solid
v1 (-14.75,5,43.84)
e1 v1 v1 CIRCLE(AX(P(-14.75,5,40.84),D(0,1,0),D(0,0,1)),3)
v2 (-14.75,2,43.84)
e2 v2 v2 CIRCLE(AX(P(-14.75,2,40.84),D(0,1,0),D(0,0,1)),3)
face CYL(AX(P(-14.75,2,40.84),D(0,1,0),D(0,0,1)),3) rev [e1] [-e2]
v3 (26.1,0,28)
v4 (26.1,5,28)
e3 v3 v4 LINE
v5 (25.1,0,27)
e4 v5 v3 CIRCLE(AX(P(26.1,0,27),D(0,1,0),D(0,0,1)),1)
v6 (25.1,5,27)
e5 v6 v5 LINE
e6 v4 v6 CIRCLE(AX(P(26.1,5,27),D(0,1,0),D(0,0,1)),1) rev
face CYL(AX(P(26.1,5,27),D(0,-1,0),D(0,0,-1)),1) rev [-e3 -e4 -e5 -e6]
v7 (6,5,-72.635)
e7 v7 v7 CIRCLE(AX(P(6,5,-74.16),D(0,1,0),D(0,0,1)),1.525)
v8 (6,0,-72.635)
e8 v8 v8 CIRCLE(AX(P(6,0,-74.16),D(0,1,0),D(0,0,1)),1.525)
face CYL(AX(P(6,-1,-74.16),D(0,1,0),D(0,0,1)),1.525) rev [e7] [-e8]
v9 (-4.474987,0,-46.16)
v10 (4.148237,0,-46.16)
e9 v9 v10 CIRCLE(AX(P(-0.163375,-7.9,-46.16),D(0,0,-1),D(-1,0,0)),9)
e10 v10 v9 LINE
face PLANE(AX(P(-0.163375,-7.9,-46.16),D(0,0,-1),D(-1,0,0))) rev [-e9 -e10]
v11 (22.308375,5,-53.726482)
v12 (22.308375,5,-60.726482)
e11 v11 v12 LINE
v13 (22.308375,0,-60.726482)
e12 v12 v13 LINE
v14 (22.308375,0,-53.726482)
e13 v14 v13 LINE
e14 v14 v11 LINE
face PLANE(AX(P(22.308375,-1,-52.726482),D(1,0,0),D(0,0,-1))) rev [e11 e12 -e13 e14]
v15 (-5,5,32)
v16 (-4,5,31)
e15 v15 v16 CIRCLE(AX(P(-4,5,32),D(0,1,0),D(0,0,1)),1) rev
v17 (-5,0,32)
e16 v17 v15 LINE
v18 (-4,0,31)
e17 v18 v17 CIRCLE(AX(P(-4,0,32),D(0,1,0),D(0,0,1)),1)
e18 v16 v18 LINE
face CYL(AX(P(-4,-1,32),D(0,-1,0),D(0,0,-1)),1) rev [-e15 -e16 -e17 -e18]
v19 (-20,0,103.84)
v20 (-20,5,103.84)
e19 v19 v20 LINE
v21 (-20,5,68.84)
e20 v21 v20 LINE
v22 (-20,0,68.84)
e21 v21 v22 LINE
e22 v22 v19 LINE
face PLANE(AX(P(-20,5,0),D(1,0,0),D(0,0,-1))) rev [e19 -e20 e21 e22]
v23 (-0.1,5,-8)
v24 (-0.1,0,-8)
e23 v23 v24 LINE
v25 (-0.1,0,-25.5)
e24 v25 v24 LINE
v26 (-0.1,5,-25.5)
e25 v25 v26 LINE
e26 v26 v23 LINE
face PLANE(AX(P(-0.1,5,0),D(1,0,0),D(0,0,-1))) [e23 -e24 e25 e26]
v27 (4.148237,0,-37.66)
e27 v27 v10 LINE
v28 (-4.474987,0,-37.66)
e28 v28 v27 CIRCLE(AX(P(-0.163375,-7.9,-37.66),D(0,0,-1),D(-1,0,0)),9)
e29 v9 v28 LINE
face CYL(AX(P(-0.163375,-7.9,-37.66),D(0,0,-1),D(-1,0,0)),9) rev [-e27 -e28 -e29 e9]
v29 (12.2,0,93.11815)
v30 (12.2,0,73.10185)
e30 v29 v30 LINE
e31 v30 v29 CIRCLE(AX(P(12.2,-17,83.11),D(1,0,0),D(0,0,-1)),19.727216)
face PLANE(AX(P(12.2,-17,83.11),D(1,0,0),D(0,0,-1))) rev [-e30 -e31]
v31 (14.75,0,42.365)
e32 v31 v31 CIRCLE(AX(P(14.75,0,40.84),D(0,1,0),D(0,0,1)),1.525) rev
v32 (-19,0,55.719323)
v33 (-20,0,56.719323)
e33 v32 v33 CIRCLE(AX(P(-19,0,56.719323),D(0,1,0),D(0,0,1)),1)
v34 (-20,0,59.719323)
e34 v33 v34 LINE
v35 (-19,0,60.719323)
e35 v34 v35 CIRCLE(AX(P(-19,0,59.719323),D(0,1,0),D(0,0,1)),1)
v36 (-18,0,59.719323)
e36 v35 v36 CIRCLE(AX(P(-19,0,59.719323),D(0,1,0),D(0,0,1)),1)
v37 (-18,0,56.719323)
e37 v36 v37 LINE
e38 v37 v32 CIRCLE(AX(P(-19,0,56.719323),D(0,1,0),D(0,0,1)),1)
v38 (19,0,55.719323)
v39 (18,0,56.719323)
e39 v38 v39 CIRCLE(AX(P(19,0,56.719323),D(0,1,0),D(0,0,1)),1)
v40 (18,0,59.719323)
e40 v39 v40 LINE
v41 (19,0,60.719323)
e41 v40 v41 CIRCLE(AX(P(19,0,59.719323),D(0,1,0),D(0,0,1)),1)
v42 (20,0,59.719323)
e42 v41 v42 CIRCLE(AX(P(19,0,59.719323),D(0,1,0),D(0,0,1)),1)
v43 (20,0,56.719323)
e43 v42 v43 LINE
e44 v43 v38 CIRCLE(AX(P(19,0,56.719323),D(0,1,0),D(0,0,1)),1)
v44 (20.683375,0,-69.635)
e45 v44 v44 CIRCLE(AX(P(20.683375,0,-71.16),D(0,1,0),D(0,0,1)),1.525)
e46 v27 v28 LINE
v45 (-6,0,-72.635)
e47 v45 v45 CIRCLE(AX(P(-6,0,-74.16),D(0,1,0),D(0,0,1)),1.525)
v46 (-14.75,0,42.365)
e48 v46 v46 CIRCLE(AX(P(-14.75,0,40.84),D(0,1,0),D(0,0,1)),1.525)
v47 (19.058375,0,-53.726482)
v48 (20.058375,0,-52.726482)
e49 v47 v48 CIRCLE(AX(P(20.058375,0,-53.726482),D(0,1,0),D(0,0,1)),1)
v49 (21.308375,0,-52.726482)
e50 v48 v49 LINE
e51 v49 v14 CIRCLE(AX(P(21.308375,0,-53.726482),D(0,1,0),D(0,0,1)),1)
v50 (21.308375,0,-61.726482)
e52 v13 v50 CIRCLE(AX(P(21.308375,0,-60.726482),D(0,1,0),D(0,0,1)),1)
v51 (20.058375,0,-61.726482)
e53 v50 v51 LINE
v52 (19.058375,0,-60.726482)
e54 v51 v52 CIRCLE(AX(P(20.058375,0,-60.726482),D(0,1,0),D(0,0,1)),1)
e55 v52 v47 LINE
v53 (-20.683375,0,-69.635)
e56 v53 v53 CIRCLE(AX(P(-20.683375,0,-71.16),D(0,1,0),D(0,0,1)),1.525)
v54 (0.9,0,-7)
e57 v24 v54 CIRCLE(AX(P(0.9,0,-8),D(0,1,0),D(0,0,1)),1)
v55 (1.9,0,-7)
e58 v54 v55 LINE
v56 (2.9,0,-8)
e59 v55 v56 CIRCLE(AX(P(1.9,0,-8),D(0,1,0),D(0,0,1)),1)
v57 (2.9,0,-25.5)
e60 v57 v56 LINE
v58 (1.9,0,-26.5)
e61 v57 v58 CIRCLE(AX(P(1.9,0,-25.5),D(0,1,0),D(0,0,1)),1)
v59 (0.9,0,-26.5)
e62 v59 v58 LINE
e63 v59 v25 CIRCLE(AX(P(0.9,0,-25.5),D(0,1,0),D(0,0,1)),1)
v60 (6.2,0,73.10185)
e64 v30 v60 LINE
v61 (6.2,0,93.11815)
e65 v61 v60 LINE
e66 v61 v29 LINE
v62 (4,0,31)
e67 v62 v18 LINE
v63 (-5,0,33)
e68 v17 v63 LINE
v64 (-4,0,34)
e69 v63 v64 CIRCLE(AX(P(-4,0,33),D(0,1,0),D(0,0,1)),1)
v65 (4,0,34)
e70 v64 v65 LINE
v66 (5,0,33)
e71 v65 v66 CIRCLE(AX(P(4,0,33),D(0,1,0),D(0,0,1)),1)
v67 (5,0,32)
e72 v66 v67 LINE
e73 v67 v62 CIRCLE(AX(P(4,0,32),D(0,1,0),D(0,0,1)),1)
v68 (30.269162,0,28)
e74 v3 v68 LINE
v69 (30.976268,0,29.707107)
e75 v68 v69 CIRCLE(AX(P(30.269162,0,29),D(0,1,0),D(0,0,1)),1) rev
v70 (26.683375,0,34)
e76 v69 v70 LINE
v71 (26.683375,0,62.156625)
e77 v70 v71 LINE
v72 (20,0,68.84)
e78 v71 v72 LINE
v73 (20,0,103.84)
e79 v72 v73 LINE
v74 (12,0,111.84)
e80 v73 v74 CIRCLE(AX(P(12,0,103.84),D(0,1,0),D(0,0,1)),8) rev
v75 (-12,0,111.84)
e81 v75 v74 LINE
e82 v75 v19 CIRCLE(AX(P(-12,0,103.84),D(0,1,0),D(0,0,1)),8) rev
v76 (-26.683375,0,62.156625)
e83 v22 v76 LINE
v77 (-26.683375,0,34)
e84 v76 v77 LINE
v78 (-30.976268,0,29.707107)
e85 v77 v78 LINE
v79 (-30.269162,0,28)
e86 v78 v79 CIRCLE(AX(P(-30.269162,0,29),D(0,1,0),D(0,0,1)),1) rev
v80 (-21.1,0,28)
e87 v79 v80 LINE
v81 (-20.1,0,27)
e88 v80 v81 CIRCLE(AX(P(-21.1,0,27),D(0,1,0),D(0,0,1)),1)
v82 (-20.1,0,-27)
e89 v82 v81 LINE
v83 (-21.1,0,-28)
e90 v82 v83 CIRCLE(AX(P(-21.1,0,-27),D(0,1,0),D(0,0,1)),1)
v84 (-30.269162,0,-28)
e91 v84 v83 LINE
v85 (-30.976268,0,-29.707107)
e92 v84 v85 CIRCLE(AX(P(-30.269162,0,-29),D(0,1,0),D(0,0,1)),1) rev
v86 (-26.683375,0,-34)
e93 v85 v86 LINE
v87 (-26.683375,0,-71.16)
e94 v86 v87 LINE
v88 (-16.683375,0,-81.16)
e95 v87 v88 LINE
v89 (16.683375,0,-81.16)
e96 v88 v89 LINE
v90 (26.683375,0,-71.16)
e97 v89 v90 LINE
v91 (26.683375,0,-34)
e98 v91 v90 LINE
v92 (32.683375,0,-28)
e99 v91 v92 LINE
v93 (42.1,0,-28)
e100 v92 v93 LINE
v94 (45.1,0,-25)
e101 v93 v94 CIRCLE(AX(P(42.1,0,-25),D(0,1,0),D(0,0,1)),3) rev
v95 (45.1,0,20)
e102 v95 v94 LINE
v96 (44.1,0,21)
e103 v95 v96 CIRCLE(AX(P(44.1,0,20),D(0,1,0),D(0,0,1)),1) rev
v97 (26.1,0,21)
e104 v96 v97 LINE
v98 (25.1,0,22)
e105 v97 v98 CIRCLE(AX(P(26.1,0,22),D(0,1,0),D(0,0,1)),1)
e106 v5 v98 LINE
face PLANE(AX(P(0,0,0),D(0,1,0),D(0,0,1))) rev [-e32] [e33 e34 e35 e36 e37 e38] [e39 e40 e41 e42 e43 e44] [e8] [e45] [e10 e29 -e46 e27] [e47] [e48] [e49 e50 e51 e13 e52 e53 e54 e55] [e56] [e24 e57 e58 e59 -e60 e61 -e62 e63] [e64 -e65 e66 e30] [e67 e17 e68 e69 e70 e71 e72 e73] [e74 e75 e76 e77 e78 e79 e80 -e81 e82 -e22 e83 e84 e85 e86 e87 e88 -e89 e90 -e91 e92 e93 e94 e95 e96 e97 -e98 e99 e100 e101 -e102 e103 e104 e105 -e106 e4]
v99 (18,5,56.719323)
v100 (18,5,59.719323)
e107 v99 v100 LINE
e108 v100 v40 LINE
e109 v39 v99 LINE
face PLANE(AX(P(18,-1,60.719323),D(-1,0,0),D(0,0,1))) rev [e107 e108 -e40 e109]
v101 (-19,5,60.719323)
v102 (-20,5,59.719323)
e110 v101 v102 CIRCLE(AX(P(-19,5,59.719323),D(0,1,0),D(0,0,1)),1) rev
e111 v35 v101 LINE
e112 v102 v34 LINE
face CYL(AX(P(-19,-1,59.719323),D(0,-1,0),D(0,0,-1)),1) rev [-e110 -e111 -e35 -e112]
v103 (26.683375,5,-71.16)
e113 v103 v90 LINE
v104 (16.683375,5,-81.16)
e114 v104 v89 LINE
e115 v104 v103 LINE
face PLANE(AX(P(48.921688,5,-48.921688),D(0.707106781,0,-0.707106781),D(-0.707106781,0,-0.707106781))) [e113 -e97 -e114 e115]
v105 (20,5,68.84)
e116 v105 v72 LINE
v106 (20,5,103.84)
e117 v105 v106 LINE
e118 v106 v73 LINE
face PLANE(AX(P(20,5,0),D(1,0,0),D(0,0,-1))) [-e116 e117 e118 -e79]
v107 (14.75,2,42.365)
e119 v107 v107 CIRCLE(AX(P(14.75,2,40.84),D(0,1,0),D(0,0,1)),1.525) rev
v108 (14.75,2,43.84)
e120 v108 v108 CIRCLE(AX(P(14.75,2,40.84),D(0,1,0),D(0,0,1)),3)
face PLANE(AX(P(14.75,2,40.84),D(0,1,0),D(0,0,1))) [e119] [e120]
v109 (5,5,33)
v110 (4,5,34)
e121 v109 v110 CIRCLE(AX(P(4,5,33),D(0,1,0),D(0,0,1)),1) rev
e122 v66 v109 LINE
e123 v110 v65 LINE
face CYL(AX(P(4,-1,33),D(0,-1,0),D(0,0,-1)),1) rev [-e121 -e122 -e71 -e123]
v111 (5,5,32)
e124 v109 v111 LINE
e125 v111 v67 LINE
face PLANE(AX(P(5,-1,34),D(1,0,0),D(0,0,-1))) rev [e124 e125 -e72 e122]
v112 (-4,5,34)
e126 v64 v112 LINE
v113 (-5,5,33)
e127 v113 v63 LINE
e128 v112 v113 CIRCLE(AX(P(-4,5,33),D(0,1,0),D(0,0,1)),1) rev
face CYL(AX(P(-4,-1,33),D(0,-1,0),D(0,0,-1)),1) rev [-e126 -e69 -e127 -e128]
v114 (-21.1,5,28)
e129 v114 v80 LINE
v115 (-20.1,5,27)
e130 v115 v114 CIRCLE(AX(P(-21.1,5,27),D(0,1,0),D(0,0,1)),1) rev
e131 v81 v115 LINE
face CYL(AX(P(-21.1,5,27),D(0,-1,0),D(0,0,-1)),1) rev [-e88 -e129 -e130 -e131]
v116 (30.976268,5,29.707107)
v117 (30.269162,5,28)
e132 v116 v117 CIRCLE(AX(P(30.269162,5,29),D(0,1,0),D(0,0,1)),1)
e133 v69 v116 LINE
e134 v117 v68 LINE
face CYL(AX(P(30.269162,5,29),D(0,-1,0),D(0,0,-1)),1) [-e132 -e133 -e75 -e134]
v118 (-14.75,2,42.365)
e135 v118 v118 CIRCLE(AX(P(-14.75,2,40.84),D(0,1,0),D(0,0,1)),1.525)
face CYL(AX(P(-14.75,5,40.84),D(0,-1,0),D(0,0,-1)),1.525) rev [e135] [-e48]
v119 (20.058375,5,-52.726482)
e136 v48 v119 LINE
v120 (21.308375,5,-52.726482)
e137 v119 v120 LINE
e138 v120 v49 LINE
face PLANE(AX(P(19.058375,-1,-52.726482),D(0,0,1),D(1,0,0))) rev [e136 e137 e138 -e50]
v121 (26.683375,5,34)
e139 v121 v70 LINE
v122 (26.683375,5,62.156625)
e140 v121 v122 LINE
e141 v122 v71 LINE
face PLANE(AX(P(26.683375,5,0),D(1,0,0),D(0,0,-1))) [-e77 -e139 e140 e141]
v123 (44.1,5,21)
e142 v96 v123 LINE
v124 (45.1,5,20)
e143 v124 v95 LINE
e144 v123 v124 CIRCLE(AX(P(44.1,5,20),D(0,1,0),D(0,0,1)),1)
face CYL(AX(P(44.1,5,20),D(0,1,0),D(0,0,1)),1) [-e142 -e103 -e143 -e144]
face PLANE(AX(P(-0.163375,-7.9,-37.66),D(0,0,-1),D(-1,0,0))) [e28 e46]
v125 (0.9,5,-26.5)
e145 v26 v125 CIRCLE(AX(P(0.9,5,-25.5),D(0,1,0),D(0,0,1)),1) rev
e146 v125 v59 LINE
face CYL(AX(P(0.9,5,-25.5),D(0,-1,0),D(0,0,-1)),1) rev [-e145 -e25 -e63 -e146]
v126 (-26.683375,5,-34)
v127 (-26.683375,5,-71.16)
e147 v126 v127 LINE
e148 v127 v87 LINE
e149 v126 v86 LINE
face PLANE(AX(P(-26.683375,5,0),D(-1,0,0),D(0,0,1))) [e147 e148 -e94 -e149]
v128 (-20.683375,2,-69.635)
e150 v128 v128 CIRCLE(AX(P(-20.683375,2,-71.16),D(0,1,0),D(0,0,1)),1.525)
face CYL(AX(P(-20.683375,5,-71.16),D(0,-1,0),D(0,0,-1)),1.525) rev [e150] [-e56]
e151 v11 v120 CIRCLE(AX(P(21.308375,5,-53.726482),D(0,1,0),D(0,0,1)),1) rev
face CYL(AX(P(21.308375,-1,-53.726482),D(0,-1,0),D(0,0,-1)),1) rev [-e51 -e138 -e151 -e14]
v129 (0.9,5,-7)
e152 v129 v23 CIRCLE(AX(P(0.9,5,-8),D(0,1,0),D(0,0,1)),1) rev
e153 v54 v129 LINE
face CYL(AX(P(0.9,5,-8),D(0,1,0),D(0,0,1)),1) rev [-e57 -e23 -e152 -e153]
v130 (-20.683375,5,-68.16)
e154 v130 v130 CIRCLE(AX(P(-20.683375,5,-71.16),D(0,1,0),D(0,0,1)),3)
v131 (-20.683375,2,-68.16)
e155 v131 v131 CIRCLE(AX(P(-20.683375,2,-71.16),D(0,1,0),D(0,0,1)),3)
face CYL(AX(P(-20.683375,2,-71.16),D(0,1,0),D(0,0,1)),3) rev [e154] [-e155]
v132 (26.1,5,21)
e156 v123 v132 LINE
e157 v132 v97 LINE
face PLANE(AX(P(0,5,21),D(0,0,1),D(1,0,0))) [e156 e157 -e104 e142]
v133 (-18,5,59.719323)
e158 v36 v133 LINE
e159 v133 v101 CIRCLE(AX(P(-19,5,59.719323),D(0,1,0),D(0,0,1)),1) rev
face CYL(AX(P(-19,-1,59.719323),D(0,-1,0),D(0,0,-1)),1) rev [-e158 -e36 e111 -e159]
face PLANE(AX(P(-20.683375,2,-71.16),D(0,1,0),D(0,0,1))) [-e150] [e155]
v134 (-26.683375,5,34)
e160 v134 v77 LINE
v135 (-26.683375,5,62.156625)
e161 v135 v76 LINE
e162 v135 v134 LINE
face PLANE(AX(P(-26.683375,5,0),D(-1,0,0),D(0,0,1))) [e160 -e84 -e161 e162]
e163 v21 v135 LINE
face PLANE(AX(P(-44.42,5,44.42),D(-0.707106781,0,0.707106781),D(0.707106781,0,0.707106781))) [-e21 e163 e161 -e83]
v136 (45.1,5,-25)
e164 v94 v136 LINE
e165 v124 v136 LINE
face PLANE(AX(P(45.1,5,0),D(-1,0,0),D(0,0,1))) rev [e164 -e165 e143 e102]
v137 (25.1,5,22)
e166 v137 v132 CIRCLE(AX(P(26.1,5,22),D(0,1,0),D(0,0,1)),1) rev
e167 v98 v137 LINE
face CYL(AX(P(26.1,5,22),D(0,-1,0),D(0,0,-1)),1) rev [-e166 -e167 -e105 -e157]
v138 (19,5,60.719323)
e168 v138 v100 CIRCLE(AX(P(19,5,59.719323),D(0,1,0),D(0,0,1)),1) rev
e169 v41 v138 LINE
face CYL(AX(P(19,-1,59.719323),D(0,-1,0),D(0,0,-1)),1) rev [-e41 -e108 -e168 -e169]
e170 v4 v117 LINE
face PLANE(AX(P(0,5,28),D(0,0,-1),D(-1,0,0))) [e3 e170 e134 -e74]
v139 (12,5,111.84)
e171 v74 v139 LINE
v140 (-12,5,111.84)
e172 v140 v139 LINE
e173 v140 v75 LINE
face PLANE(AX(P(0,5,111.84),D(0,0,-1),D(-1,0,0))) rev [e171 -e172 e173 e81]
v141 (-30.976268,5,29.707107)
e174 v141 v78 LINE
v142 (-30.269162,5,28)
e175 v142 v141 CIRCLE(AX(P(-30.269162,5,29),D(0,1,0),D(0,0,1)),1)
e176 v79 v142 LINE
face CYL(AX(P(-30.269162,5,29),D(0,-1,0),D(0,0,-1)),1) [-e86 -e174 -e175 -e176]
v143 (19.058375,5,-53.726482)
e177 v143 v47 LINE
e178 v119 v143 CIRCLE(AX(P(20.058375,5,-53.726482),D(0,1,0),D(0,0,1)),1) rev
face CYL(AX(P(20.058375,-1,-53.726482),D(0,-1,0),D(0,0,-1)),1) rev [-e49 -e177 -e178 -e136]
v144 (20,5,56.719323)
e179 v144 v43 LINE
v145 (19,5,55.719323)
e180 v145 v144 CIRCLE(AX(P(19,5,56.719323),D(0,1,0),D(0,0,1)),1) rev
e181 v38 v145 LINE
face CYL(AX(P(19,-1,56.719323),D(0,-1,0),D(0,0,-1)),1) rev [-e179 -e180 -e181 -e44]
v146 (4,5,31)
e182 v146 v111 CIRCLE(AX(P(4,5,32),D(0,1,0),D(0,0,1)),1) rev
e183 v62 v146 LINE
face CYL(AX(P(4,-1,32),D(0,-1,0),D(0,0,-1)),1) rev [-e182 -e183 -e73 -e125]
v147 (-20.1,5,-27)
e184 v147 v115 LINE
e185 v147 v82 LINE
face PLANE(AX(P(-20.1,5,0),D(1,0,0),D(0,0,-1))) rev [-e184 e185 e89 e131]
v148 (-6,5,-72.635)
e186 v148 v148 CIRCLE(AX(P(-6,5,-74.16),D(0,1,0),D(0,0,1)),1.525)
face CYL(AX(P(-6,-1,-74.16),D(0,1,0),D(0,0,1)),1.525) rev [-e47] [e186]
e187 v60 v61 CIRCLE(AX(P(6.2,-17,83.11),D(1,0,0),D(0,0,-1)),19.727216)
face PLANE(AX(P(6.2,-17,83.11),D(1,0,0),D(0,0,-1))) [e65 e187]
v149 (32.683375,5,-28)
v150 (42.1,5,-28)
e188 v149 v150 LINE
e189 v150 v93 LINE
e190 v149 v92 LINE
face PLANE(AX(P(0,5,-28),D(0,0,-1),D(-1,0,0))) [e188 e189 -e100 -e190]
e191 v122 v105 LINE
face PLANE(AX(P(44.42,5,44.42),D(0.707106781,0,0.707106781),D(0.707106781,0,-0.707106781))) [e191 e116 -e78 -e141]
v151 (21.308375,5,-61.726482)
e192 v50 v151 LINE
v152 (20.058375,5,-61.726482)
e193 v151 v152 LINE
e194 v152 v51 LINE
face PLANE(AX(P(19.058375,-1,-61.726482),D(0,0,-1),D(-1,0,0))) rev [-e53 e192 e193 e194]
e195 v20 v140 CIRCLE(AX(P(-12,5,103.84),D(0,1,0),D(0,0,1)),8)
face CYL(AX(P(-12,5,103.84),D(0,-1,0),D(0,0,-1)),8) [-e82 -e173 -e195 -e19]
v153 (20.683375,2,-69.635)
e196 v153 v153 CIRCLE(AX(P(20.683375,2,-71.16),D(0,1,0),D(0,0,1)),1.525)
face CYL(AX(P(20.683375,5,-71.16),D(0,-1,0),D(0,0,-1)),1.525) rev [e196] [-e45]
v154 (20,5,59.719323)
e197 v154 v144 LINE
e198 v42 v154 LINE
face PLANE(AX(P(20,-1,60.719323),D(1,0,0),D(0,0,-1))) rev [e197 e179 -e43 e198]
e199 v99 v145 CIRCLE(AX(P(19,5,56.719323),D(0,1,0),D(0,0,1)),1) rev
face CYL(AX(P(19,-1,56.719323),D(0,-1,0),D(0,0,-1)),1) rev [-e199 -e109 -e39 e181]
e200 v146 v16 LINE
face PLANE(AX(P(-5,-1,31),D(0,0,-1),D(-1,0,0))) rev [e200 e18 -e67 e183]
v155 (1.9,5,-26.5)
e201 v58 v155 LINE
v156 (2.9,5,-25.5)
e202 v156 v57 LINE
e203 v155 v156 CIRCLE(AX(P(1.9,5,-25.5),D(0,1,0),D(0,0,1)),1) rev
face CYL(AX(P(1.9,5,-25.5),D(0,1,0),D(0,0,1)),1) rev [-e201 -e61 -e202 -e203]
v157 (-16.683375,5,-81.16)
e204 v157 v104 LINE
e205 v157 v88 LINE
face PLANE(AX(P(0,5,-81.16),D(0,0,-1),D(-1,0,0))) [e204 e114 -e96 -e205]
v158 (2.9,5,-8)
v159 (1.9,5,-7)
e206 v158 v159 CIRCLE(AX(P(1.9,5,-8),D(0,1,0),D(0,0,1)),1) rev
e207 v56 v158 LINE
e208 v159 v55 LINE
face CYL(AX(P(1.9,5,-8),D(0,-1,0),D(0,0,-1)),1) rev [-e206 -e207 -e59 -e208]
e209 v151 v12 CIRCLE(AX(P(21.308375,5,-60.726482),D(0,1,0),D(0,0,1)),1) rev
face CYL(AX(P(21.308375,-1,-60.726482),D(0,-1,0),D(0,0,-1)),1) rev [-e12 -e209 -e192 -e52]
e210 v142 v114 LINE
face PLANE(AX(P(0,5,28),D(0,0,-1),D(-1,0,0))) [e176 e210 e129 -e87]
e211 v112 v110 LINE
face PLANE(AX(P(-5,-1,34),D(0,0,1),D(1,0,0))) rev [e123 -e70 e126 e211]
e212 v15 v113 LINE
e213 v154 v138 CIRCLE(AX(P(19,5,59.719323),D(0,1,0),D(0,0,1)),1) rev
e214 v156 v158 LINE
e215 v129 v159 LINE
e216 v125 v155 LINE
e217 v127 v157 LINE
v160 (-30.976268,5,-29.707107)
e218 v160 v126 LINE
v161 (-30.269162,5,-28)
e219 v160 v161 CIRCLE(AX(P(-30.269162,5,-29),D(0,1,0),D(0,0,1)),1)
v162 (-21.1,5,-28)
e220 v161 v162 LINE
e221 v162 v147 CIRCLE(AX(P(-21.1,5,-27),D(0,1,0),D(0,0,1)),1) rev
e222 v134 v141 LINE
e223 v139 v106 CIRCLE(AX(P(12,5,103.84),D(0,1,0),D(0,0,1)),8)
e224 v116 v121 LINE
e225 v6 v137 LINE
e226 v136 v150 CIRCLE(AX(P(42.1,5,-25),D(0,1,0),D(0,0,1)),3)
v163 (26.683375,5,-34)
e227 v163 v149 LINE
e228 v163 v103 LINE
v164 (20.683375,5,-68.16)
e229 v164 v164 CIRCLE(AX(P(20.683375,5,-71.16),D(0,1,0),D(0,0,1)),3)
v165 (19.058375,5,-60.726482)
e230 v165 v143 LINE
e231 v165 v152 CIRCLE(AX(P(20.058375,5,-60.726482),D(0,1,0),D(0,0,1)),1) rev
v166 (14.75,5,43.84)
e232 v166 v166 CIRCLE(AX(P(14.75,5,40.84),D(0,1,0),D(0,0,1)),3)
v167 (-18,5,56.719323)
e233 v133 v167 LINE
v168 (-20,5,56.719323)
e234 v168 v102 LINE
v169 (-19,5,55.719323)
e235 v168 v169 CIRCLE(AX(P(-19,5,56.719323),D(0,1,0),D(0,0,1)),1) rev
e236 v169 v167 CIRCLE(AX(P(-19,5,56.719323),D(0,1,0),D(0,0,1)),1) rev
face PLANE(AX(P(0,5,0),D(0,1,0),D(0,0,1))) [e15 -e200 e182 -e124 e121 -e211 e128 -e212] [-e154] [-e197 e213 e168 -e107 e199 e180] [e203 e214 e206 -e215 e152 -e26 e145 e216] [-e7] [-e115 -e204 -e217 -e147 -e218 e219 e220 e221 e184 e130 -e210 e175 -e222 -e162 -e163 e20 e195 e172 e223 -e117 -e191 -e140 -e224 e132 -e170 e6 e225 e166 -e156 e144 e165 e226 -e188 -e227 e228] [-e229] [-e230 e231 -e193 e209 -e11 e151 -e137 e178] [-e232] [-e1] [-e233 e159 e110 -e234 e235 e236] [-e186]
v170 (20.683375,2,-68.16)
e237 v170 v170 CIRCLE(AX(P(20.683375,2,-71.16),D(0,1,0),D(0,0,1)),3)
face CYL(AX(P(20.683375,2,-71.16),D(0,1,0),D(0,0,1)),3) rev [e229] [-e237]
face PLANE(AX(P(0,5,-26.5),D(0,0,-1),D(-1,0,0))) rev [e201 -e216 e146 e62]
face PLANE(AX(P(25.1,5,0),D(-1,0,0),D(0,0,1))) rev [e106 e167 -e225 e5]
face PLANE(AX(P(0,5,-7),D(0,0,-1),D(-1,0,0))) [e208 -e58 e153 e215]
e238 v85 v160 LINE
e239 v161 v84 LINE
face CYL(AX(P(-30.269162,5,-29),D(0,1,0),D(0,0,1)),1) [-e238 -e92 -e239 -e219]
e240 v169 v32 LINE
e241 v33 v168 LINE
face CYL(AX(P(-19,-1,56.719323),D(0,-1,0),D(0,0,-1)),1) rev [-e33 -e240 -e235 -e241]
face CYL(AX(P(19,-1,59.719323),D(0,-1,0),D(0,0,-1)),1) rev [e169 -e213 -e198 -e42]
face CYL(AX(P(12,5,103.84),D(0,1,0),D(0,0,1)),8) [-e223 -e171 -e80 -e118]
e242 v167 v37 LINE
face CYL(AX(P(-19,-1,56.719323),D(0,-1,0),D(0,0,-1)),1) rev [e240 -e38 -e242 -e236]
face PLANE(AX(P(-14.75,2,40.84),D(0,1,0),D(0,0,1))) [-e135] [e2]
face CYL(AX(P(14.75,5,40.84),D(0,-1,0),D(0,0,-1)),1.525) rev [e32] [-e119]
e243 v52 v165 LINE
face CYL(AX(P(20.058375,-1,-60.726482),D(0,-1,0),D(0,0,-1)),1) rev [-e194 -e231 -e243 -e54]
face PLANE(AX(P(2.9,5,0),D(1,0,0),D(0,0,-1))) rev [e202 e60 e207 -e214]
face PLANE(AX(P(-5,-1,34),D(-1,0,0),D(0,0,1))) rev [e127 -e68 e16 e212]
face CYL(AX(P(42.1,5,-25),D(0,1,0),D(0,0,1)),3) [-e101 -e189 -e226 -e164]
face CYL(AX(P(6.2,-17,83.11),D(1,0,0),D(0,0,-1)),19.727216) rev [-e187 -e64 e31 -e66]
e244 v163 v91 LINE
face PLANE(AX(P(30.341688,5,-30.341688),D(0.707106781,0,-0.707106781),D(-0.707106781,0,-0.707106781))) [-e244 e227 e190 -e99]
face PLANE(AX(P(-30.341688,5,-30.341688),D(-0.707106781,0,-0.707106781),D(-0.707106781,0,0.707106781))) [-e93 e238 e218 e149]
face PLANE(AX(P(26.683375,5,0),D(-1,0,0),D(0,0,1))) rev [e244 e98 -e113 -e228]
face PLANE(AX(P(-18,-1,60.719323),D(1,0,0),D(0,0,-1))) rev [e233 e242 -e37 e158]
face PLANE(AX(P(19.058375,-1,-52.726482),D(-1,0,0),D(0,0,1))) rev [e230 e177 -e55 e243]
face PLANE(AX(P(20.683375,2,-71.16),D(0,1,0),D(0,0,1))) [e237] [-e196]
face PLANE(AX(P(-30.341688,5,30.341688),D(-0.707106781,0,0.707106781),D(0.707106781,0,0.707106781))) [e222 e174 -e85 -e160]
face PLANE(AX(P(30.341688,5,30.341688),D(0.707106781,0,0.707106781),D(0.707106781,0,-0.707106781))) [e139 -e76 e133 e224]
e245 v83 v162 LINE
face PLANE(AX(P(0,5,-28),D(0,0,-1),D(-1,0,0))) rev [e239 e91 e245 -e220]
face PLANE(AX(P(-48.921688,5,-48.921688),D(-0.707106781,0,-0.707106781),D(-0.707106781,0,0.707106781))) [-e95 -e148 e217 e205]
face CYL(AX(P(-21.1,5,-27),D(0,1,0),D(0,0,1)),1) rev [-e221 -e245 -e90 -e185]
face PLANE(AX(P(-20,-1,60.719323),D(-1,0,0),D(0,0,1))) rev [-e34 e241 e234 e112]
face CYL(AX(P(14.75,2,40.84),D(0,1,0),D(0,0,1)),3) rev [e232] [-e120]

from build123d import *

# Parameters (mm, degrees)
SKETCH1_R           = 1.525
SKETCH1_W           = 3
SKETCH1_H           = 19.5
BOSS_EXTRUDE1_DEPTH = 5
FILLET4_R           = 3
FILLET5_R           = 1
SKETCH4_R           = 3
CUT_EXTRUDE1_DEPTH  = 3
FILLET6_R           = 8
SKETCH6_R           = 19.727216355
CUT_EXTRUDE2_DEPTH  = 6
SKETCH9_R           = 9
CUT_EXTRUDE3_DEPTH  = 8.5
SKETCH11_W          = 2
SKETCH11_H          = 5
SKETCH11_W_2        = 10
SKETCH11_H_2        = 3
CUT_EXTRUDE4_DEPTH  = 6
FILLET7_R           = 1
SKETCH13_R          = 1.525
SKETCH13_W          = 3.25
SKETCH13_H          = 9
CUT_EXTRUDE5_DEPTH  = 6
FILLET8_R           = 1


with BuildPart() as part:
    # Sketch1 → Boss-Extrude1 (new body)
    with BuildSketch(Plane(origin=(0, 0, 0), x_dir=(1, 0, 0), z_dir=(0, 1, 0))):
        Polygon((-26.68337521, 71.16), (-26.68337521, 34), (-32.68337521, 28), (-20.1, 28), (-20.1, -28), (-32.68337521, -28), (-26.68337521, -34), (-26.68337521, -62.15662479), (-20, -68.84), (-20, -111.84), (20, -111.84), (20, -68.84), (26.68337521, -62.15662479), (26.68337521, -34), (32.68337521, -28), (25.1, -28), (25.1, -21), (45.1, -21), (45.1, 28), (32.68337521, 28), (26.68337521, 34), (26.68337521, 71.16), (16.68337521, 81.16), (-16.68337521, 81.16), align=None)
        with Locations(Location((-20.68337521, 71.16, 0), (0, 0, 270))):
            Circle(SKETCH1_R, mode=Mode.SUBTRACT)
        with Locations(Location((20.68337521, 71.16, 0), (0, 0, 270))):
            Circle(SKETCH1_R, mode=Mode.SUBTRACT)
        with Locations((1.4, 16.75)):
            Rectangle(SKETCH1_W, SKETCH1_H, mode=Mode.SUBTRACT)
        with Locations(Location((14.75, -40.84, 0), (0, 0, 270))):
            Circle(SKETCH1_R, mode=Mode.SUBTRACT)
        with Locations(Location((-14.75, -40.84, 0), (0, 0, 270))):
            Circle(SKETCH1_R, mode=Mode.SUBTRACT)
    extrude(amount=BOSS_EXTRUDE1_DEPTH)

    # Fillet4
    fillet4_edges = [part.edges().sort_by_distance(p)[0] for p in [
        (45.1, 2.5, -28),
    ]]
    fillet(fillet4_edges, radius=FILLET4_R)

    # Fillet5
    fillet5_edges = [part.edges().sort_by_distance(p)[0] for p in [
        (-0.1, 2.5, -26.5),
        (-0.1, 2.5, -7),
        (2.9, 2.5, -7),
        (2.9, 2.5, -26.5),
        (45.1, 2.5, 21),
        (25.1, 2.5, 21),
        (25.1, 2.5, 28),
        (32.68337521, 2.5, 28),
        (-32.68337521, 2.5, 28),
        (-20.1, 2.5, 28),
        (-20.1, 2.5, -28),
        (-32.68337521, 2.5, -28),
    ]]
    fillet(fillet5_edges, radius=FILLET5_R)

    # Sketch4 → Cut-Extrude1 (cut)
    with BuildSketch(Plane(origin=(0, 5, 0), x_dir=(1, 0, 0), z_dir=(0, 1, 0))):
        with Locations(Location((-20.68337521, 71.16, 0), (0, 0, 270))):
            Circle(SKETCH4_R)
        with Locations(Location((20.68337521, 71.16, 0), (0, 0, 270))):
            Circle(SKETCH4_R)
        with Locations(Location((-14.75, -40.84, 0), (0, 0, 270))):
            Circle(SKETCH4_R)
        with Locations(Location((14.75, -40.84, 0), (0, 0, 270))):
            Circle(SKETCH4_R)
    extrude(amount=-CUT_EXTRUDE1_DEPTH, mode=Mode.SUBTRACT)

    # Fillet6
    fillet6_edges = [part.edges().sort_by_distance(p)[0] for p in [
        (20, 2.5, 111.84),
        (-20, 2.5, 111.84),
    ]]
    fillet(fillet6_edges, radius=FILLET6_R)

    # Sketch6 → Cut-Extrude2 (cut)
    with BuildSketch(Plane(origin=(12.2, 0, 0), x_dir=(0, 0, -1), z_dir=(1, 0, 0))):
        with Locations((-83.11, -17)):
            Circle(SKETCH6_R)
    extrude(amount=-CUT_EXTRUDE2_DEPTH, mode=Mode.SUBTRACT)

    # Sketch9 → Cut-Extrude3 (cut)
    with BuildSketch(Plane(origin=(0, 0, -46.16), x_dir=(-1, 0, 0), z_dir=(0, 0, -1))):
        with Locations((0.16337521, -7.9)):
            Circle(SKETCH9_R)
    extrude(amount=-CUT_EXTRUDE3_DEPTH, mode=Mode.SUBTRACT)

    # Sketch11 → Cut-Extrude4 (cut)
    with BuildSketch(Plane(origin=(0, 5, 0), x_dir=(1, 0, 0), z_dir=(0, 1, 0))):
        with Locations((-19, -58.219322965)):
            Rectangle(SKETCH11_W, SKETCH11_H)
        with Locations((19, -58.219322965)):
            Rectangle(SKETCH11_W, SKETCH11_H)
        with Locations((0, -32.5)):
            Rectangle(SKETCH11_W_2, SKETCH11_H_2)
    extrude(amount=-CUT_EXTRUDE4_DEPTH, mode=Mode.SUBTRACT)

    # Fillet7
    fillet7_edges = [part.edges().sort_by_distance(p)[0] for p in [
        (-18, 2.5, 55.719322965),
        (-20, 2.5, 55.719322965),
        (-18, 2.5, 60.719322965),
        (-20, 2.5, 60.719322965),
        (20, 2.5, 60.719322965),
        (18, 2.5, 60.719322965),
        (18, 2.5, 55.719322965),
        (20, 2.5, 55.719322965),
        (5, 2.5, 31),
        (5, 2.5, 34),
        (-5, 2.5, 34),
        (-5, 2.5, 31),
    ]]
    fillet(fillet7_edges, radius=FILLET7_R - 0.0001)  # a hair under: the kernel refuses the full size

    # Sketch13 → Cut-Extrude5 (cut)
    with BuildSketch(Plane(origin=(0, 5, 0), x_dir=(1, 0, 0), z_dir=(0, 1, 0))):
        with Locations(Location((-6, 74.16, 0), (0, 0, 270))):
            Circle(SKETCH13_R)
        with Locations(Location((6, 74.16, 0), (0, 0, 270))):
            Circle(SKETCH13_R)
        with Locations((20.68337521, 57.226482401)):
            Rectangle(SKETCH13_W, SKETCH13_H)
    extrude(amount=-CUT_EXTRUDE5_DEPTH, mode=Mode.SUBTRACT)

    # Fillet8
    fillet8_edges = [part.edges().sort_by_distance(p)[0] for p in [
        (22.30837521, 2.5, -61.726482401),
        (22.30837521, 2.5, -52.726482401),
        (19.05837521, 2.5, -52.726482401),
        (19.05837521, 2.5, -61.726482401),
    ]]
    fillet(fillet8_edges, radius=FILLET8_R)


solid = part.part
